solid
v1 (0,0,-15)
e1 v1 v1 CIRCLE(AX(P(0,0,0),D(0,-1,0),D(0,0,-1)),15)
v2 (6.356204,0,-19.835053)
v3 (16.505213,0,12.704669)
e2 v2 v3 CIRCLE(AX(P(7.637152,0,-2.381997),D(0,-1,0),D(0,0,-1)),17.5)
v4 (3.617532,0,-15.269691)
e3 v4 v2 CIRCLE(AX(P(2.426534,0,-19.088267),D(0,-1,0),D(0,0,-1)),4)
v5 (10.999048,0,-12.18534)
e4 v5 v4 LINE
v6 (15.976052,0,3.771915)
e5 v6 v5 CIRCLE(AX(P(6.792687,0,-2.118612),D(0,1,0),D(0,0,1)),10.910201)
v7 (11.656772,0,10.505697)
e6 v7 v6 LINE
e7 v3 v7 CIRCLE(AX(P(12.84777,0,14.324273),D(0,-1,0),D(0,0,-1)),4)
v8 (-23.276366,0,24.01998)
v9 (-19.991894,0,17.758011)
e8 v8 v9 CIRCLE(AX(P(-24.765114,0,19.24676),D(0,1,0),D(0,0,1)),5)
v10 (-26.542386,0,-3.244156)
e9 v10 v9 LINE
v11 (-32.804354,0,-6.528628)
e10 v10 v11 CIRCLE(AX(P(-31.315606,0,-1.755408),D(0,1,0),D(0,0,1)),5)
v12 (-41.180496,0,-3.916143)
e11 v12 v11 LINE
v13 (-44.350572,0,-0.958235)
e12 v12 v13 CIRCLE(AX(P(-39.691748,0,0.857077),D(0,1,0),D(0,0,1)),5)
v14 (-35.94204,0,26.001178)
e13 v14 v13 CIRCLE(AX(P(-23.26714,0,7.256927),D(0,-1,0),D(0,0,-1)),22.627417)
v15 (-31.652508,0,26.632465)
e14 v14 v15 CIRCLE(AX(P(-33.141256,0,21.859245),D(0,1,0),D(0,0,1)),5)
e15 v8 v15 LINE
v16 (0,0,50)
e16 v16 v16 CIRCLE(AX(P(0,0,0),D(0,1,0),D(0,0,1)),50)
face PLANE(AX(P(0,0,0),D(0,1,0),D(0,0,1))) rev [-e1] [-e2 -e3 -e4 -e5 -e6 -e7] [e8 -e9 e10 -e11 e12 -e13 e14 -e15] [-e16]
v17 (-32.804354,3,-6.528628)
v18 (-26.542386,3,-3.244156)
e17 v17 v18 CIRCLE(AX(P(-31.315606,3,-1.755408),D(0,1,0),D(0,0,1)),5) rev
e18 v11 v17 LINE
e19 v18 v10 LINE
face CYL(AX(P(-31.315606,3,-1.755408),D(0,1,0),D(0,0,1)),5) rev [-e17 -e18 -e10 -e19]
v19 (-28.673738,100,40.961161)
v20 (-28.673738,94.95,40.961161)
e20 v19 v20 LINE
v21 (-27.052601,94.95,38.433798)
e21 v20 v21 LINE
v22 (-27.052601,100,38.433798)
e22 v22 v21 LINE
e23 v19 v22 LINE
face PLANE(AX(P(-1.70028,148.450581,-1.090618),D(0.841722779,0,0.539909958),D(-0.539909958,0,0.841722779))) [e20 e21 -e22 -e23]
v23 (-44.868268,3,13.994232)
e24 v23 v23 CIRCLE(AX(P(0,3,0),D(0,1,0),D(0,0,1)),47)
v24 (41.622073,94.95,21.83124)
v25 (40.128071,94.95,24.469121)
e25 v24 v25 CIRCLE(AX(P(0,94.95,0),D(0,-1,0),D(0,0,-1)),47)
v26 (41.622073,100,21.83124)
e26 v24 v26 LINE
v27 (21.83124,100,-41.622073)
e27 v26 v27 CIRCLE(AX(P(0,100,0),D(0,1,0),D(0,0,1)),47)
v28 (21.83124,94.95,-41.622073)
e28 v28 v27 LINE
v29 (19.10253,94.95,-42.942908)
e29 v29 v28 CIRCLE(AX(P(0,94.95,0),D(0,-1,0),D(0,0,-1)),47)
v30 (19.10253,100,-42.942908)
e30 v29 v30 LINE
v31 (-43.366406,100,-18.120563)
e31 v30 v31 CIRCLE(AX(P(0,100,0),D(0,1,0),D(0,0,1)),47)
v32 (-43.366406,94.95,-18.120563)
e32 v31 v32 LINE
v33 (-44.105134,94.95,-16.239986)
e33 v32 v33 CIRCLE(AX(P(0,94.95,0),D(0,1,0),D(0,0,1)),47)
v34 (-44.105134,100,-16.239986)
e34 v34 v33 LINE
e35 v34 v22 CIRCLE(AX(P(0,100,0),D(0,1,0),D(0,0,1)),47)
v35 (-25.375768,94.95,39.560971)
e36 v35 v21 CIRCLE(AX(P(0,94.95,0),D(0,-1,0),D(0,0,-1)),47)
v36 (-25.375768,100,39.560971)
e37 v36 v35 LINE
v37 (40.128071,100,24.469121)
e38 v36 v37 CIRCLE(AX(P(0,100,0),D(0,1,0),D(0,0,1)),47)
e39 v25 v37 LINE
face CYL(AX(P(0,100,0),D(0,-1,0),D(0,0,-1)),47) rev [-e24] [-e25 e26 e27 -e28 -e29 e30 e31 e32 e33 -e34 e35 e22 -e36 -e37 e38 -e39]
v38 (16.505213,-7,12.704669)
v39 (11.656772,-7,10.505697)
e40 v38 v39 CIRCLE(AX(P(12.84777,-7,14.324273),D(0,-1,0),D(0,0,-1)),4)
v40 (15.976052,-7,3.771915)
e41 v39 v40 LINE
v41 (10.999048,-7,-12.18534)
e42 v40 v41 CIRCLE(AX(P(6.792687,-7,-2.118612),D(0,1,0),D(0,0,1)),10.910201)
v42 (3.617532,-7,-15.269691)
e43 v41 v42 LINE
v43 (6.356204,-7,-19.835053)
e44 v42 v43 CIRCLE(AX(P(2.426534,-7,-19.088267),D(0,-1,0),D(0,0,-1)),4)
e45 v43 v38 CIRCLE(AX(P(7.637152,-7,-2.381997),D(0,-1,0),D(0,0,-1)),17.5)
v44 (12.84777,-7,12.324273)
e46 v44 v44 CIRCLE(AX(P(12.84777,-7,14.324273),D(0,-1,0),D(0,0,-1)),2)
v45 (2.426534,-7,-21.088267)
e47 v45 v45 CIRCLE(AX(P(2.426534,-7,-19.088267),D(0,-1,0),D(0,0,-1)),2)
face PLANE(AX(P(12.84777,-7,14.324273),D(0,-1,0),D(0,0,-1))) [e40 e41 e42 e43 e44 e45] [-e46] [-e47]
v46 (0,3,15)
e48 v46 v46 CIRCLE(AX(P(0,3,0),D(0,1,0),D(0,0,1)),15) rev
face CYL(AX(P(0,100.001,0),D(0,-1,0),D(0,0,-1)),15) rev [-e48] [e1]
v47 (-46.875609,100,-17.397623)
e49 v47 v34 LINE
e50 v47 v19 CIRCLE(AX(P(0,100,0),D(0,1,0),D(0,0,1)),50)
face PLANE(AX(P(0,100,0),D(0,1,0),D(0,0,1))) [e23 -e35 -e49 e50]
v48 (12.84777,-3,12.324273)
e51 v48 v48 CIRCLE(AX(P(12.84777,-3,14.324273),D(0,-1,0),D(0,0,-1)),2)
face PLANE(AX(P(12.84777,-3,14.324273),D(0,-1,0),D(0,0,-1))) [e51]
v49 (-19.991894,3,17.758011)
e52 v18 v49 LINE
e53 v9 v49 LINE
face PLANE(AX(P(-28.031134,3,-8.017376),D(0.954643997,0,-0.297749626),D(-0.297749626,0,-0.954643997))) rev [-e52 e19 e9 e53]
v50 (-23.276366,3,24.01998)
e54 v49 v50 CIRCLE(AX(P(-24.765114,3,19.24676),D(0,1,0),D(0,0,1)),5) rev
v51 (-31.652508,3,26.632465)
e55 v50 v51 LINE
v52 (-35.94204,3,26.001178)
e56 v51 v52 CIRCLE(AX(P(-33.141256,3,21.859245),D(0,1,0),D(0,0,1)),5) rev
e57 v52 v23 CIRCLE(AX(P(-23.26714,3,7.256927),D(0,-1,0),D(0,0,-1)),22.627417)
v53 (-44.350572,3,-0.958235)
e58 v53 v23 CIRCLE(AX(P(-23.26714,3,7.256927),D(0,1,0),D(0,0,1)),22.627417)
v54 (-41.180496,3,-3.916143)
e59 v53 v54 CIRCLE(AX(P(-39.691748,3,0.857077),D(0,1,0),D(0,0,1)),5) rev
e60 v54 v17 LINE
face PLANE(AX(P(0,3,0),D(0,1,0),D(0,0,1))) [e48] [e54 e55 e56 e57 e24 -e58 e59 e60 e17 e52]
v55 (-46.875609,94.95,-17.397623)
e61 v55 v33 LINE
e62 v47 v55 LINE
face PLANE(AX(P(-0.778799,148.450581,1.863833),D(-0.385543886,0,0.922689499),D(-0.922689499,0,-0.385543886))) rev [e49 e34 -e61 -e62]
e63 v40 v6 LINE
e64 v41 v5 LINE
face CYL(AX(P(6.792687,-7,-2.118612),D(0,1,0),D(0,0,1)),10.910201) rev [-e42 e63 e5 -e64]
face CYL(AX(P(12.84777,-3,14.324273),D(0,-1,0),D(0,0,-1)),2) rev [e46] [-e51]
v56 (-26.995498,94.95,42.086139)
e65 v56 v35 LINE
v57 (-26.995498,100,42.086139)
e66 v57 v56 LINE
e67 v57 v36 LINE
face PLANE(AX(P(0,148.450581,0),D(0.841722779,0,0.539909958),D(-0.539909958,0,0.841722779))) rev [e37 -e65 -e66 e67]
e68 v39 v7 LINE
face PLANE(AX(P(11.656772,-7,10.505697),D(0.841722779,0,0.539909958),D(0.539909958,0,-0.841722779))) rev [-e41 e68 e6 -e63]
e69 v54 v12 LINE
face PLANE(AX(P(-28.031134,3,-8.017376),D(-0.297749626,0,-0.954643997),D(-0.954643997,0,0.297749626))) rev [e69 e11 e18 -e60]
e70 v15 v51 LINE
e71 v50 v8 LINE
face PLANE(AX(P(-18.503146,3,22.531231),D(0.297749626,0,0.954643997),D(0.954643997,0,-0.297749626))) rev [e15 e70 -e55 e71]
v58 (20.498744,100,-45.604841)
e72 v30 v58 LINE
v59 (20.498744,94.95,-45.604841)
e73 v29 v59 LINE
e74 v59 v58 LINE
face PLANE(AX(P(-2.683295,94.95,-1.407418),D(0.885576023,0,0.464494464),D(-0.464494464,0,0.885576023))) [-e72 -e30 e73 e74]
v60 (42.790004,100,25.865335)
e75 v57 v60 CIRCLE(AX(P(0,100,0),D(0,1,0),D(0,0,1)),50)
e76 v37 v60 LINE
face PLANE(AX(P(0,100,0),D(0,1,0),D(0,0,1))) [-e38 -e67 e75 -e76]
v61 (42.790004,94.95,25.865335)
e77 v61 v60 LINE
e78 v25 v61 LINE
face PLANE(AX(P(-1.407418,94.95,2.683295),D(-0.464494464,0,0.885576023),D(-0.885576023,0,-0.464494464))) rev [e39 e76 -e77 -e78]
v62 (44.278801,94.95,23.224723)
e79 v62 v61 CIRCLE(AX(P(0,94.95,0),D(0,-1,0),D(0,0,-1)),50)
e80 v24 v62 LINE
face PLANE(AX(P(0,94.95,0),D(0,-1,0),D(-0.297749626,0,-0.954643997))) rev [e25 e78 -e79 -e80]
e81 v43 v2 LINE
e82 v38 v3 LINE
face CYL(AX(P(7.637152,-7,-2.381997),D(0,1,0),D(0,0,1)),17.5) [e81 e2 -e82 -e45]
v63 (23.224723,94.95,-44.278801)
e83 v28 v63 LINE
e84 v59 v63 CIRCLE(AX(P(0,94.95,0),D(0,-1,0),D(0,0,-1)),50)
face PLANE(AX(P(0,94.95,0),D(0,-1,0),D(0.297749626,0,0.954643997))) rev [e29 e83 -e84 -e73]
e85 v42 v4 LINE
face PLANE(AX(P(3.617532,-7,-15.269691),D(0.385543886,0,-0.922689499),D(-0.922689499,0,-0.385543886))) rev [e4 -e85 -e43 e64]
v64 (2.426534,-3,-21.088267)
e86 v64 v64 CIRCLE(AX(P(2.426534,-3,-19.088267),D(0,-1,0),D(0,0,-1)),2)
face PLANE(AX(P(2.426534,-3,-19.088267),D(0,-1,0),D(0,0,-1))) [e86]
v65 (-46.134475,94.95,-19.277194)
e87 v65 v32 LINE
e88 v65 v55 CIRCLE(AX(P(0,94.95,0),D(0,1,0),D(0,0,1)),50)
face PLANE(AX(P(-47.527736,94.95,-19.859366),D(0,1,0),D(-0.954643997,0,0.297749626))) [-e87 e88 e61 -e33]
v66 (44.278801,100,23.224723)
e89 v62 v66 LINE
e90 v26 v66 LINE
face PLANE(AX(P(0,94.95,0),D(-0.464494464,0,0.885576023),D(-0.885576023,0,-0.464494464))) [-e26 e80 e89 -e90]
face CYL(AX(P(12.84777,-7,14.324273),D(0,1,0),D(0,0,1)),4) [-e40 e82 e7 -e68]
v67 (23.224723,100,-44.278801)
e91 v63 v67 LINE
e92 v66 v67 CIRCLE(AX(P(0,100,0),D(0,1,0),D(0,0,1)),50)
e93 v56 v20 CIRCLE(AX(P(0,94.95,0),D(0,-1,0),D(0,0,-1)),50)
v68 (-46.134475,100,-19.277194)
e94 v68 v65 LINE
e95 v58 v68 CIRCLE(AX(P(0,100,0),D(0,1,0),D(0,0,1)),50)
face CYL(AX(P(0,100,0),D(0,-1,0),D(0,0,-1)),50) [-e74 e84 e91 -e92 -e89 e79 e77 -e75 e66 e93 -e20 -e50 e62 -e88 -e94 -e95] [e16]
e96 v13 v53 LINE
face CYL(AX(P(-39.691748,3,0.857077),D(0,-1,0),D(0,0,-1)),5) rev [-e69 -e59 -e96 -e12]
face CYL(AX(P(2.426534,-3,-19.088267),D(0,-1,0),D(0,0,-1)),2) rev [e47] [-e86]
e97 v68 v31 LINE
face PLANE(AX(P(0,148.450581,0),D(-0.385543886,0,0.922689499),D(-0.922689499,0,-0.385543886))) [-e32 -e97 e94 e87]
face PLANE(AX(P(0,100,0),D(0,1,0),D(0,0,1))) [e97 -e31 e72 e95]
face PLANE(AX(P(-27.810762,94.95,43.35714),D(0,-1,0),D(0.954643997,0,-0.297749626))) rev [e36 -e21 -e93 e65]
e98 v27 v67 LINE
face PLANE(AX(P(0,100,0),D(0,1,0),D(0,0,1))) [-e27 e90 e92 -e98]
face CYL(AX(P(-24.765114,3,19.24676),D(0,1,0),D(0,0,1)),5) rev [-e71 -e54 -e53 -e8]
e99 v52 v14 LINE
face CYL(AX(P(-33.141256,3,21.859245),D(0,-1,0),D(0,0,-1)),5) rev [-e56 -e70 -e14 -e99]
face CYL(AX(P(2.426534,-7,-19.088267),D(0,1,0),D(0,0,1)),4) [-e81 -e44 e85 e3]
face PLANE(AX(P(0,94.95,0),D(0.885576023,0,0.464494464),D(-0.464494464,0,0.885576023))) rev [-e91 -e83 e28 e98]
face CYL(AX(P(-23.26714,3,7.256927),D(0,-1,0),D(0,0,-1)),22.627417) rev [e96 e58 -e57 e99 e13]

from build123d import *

# Parameters (mm, degrees)
SKETCH1_R           = 50
BOSS_EXTRUDE1_DEPTH = 100
SHELL1_T            = -3
CUT_EXTRUDE1_REACH  = 124.474
SKETCH2_R           = 15
BOSS_EXTRUDE2_DEPTH = 7
SKETCH4_R           = 2
CUT_EXTRUDE2_DEPTH  = 4
CUT_EXTRUDE3_DEPTH  = 3
FILLET1_R           = 5
CAVITY1_START       = 94.95
CAVITY1_DEPTH       = 5.05


# Read off the part's stored shape, not the designer's step: Cavity1
with BuildPart() as part:
    # Sketch1 → Boss-Extrude1 (new body)
    with BuildSketch(Plane(origin=(0, 0, 0), x_dir=(1, 0, 0), z_dir=(0, 1, 0))):
        with Locations(Location((0, 0, 0), (0, 0, 270))):
            Circle(SKETCH1_R)
    extrude(amount=BOSS_EXTRUDE1_DEPTH)

    # Shell1
    shell1_openings = [part.faces().sort_by_distance(p)[0] for p in [
        (0, 100, 0),
    ]]
    offset(amount=SHELL1_T, openings=shell1_openings, kind=Kind.INTERSECTION)

    # Sketch2 → Cut-Extrude1 (cut, up to next)
    with BuildSketch(Plane.XZ, mode=Mode.PRIVATE) as cut_extrude1_sk1:
        with Locations(Location((0, 0, 0), (0, 0, 270))):
            Circle(SKETCH2_R)
    cut_extrude1_tool1 = extrude(cut_extrude1_sk1.sketch, amount=-CUT_EXTRUDE1_REACH, mode=Mode.PRIVATE) & part.part
    add(cut_extrude1_tool1.solids().sort_by_distance((0, 0, 0))[0], mode=Mode.SUBTRACT)

    # Sketch3 → Boss-Extrude2 (add)
    with BuildSketch(Plane.XZ):
        with BuildLine():
            Line((11.656771923, 10.505696947), (15.97605159, 3.771914714))
            ThreePointArc((15.97605159, 3.771914714), (17.208044811, -5.36712002), (10.999048015, -12.185339871))
            Line((10.999048015, -12.185339871), (3.617532023, -15.269690962))
            ThreePointArc((3.617532023, -15.269690962), (-1.003618951, -21.145948661), (6.356204016, -19.835053254))
            ThreePointArc((6.356204016, -19.835053254), (24.343421913, -7.592615462), (16.505212694, 12.704669259))
            ThreePointArc((16.505212694, 12.704669259), (11.195588228, 17.967114404), (11.656771923, 10.505696947))
        make_face()
    extrude(amount=BOSS_EXTRUDE2_DEPTH)

    # Sketch4 → Cut-Extrude2 (cut)
    with BuildSketch(Plane.XZ.offset(7)):
        with Locations(Location((12.847770427, 14.324272933, 0), (0, 0, 270))):
            Circle(SKETCH4_R)
        with Locations(Location((2.426533519, -19.088266948, 0), (0, 0, 270))):
            Circle(SKETCH4_R)
    extrude(amount=-CUT_EXTRUDE2_DEPTH, mode=Mode.SUBTRACT)

    # Sketch5 → Cut-Extrude3 (cut)
    with BuildSketch(Plane.XZ):
        with BuildLine():
            Line((-28.03113406, -8.017376473), (-18.503146029, 22.531231418))
            Line((-18.503146029, 22.531231418), (-33.777449975, 27.295225433))
            ThreePointArc((-33.777449975, 27.295225433), (-44.86826784, 13.99423242), (-43.305438005, -3.253382458))
            Line((-43.305438005, -3.253382458), (-28.03113406, -8.017376473))
        make_face()
    extrude(amount=-CUT_EXTRUDE3_DEPTH, mode=Mode.SUBTRACT)

    # Fillet1
    fillet1_edges = [part.edges().sort_by_distance(p)[0] for p in [
        (-33.777449975, 1.5, 27.295225433),
        (-18.503146029, 1.5, 22.531231418),
        (-28.03113406, 1.5, -8.017376473),
        (-43.305438005, 1.5, -3.253382458),
    ]]
    fillet(fillet1_edges, radius=FILLET1_R)

    # Cavity1 outline → Cavity1 (cut)
    with BuildSketch(Plane(origin=(0, 0, 0), x_dir=(1, 0, 0), z_dir=(0, 1, 0)).offset(CAVITY1_START)):
        with BuildLine():
            ThreePointArc((19.102530443, 42.942907804), (20.477537397, 42.30449695), (21.831239809, 41.622073091))
            Line((21.831239809, 41.622073091), (23.224723201, 44.278801161))
            ThreePointArc((23.224723201, 44.278801161), (21.871785206, 44.962484495), (20.498743854, 45.604840756))
            Line((20.498743854, 45.604840756), (19.102530443, 42.942907804))
        make_face()
        with BuildLine():
            Line((44.278801161, -23.224723201), (41.622073091, -21.831239809))
            ThreePointArc((41.622073091, -21.831239809), (40.896346213, -23.162229305), (40.128071352, -24.469121144))
            Line((40.128071352, -24.469121144), (42.790004304, -25.865334555))
            ThreePointArc((42.790004304, -25.865334555), (43.55441916, -24.556314293), (44.278801161, -23.224723201))
        make_face()
        with BuildLine():
            ThreePointArc((-44.105134018, 16.239986245), (-43.745876837, 17.184244522), (-43.366406458, 18.120562655))
            Line((-43.366406458, 18.120562655), (-46.134474955, 19.277194314))
            ThreePointArc((-46.134474955, 19.277194314), (-46.514536622, 18.341152714), (-46.875608808, 17.397623369))
            Line((-46.875608808, 17.397623369), (-44.105134018, 16.239986245))
        make_face()
        with BuildLine():
            Line((-26.99549792, -42.086138954), (-25.375768045, -39.560970617))
            ThreePointArc((-25.375768045, -39.560970617), (-26.220241948, -39.006395786), (-27.052600539, -38.43379768))
            Line((-27.052600539, -38.43379768), (-28.673738451, -40.961161156))
            ThreePointArc((-28.673738451, -40.961161156), (-27.840301063, -41.532127765), (-26.99549792, -42.086138954))
        make_face()
    extrude(amount=CAVITY1_DEPTH, mode=Mode.SUBTRACT)


solid = part.part
